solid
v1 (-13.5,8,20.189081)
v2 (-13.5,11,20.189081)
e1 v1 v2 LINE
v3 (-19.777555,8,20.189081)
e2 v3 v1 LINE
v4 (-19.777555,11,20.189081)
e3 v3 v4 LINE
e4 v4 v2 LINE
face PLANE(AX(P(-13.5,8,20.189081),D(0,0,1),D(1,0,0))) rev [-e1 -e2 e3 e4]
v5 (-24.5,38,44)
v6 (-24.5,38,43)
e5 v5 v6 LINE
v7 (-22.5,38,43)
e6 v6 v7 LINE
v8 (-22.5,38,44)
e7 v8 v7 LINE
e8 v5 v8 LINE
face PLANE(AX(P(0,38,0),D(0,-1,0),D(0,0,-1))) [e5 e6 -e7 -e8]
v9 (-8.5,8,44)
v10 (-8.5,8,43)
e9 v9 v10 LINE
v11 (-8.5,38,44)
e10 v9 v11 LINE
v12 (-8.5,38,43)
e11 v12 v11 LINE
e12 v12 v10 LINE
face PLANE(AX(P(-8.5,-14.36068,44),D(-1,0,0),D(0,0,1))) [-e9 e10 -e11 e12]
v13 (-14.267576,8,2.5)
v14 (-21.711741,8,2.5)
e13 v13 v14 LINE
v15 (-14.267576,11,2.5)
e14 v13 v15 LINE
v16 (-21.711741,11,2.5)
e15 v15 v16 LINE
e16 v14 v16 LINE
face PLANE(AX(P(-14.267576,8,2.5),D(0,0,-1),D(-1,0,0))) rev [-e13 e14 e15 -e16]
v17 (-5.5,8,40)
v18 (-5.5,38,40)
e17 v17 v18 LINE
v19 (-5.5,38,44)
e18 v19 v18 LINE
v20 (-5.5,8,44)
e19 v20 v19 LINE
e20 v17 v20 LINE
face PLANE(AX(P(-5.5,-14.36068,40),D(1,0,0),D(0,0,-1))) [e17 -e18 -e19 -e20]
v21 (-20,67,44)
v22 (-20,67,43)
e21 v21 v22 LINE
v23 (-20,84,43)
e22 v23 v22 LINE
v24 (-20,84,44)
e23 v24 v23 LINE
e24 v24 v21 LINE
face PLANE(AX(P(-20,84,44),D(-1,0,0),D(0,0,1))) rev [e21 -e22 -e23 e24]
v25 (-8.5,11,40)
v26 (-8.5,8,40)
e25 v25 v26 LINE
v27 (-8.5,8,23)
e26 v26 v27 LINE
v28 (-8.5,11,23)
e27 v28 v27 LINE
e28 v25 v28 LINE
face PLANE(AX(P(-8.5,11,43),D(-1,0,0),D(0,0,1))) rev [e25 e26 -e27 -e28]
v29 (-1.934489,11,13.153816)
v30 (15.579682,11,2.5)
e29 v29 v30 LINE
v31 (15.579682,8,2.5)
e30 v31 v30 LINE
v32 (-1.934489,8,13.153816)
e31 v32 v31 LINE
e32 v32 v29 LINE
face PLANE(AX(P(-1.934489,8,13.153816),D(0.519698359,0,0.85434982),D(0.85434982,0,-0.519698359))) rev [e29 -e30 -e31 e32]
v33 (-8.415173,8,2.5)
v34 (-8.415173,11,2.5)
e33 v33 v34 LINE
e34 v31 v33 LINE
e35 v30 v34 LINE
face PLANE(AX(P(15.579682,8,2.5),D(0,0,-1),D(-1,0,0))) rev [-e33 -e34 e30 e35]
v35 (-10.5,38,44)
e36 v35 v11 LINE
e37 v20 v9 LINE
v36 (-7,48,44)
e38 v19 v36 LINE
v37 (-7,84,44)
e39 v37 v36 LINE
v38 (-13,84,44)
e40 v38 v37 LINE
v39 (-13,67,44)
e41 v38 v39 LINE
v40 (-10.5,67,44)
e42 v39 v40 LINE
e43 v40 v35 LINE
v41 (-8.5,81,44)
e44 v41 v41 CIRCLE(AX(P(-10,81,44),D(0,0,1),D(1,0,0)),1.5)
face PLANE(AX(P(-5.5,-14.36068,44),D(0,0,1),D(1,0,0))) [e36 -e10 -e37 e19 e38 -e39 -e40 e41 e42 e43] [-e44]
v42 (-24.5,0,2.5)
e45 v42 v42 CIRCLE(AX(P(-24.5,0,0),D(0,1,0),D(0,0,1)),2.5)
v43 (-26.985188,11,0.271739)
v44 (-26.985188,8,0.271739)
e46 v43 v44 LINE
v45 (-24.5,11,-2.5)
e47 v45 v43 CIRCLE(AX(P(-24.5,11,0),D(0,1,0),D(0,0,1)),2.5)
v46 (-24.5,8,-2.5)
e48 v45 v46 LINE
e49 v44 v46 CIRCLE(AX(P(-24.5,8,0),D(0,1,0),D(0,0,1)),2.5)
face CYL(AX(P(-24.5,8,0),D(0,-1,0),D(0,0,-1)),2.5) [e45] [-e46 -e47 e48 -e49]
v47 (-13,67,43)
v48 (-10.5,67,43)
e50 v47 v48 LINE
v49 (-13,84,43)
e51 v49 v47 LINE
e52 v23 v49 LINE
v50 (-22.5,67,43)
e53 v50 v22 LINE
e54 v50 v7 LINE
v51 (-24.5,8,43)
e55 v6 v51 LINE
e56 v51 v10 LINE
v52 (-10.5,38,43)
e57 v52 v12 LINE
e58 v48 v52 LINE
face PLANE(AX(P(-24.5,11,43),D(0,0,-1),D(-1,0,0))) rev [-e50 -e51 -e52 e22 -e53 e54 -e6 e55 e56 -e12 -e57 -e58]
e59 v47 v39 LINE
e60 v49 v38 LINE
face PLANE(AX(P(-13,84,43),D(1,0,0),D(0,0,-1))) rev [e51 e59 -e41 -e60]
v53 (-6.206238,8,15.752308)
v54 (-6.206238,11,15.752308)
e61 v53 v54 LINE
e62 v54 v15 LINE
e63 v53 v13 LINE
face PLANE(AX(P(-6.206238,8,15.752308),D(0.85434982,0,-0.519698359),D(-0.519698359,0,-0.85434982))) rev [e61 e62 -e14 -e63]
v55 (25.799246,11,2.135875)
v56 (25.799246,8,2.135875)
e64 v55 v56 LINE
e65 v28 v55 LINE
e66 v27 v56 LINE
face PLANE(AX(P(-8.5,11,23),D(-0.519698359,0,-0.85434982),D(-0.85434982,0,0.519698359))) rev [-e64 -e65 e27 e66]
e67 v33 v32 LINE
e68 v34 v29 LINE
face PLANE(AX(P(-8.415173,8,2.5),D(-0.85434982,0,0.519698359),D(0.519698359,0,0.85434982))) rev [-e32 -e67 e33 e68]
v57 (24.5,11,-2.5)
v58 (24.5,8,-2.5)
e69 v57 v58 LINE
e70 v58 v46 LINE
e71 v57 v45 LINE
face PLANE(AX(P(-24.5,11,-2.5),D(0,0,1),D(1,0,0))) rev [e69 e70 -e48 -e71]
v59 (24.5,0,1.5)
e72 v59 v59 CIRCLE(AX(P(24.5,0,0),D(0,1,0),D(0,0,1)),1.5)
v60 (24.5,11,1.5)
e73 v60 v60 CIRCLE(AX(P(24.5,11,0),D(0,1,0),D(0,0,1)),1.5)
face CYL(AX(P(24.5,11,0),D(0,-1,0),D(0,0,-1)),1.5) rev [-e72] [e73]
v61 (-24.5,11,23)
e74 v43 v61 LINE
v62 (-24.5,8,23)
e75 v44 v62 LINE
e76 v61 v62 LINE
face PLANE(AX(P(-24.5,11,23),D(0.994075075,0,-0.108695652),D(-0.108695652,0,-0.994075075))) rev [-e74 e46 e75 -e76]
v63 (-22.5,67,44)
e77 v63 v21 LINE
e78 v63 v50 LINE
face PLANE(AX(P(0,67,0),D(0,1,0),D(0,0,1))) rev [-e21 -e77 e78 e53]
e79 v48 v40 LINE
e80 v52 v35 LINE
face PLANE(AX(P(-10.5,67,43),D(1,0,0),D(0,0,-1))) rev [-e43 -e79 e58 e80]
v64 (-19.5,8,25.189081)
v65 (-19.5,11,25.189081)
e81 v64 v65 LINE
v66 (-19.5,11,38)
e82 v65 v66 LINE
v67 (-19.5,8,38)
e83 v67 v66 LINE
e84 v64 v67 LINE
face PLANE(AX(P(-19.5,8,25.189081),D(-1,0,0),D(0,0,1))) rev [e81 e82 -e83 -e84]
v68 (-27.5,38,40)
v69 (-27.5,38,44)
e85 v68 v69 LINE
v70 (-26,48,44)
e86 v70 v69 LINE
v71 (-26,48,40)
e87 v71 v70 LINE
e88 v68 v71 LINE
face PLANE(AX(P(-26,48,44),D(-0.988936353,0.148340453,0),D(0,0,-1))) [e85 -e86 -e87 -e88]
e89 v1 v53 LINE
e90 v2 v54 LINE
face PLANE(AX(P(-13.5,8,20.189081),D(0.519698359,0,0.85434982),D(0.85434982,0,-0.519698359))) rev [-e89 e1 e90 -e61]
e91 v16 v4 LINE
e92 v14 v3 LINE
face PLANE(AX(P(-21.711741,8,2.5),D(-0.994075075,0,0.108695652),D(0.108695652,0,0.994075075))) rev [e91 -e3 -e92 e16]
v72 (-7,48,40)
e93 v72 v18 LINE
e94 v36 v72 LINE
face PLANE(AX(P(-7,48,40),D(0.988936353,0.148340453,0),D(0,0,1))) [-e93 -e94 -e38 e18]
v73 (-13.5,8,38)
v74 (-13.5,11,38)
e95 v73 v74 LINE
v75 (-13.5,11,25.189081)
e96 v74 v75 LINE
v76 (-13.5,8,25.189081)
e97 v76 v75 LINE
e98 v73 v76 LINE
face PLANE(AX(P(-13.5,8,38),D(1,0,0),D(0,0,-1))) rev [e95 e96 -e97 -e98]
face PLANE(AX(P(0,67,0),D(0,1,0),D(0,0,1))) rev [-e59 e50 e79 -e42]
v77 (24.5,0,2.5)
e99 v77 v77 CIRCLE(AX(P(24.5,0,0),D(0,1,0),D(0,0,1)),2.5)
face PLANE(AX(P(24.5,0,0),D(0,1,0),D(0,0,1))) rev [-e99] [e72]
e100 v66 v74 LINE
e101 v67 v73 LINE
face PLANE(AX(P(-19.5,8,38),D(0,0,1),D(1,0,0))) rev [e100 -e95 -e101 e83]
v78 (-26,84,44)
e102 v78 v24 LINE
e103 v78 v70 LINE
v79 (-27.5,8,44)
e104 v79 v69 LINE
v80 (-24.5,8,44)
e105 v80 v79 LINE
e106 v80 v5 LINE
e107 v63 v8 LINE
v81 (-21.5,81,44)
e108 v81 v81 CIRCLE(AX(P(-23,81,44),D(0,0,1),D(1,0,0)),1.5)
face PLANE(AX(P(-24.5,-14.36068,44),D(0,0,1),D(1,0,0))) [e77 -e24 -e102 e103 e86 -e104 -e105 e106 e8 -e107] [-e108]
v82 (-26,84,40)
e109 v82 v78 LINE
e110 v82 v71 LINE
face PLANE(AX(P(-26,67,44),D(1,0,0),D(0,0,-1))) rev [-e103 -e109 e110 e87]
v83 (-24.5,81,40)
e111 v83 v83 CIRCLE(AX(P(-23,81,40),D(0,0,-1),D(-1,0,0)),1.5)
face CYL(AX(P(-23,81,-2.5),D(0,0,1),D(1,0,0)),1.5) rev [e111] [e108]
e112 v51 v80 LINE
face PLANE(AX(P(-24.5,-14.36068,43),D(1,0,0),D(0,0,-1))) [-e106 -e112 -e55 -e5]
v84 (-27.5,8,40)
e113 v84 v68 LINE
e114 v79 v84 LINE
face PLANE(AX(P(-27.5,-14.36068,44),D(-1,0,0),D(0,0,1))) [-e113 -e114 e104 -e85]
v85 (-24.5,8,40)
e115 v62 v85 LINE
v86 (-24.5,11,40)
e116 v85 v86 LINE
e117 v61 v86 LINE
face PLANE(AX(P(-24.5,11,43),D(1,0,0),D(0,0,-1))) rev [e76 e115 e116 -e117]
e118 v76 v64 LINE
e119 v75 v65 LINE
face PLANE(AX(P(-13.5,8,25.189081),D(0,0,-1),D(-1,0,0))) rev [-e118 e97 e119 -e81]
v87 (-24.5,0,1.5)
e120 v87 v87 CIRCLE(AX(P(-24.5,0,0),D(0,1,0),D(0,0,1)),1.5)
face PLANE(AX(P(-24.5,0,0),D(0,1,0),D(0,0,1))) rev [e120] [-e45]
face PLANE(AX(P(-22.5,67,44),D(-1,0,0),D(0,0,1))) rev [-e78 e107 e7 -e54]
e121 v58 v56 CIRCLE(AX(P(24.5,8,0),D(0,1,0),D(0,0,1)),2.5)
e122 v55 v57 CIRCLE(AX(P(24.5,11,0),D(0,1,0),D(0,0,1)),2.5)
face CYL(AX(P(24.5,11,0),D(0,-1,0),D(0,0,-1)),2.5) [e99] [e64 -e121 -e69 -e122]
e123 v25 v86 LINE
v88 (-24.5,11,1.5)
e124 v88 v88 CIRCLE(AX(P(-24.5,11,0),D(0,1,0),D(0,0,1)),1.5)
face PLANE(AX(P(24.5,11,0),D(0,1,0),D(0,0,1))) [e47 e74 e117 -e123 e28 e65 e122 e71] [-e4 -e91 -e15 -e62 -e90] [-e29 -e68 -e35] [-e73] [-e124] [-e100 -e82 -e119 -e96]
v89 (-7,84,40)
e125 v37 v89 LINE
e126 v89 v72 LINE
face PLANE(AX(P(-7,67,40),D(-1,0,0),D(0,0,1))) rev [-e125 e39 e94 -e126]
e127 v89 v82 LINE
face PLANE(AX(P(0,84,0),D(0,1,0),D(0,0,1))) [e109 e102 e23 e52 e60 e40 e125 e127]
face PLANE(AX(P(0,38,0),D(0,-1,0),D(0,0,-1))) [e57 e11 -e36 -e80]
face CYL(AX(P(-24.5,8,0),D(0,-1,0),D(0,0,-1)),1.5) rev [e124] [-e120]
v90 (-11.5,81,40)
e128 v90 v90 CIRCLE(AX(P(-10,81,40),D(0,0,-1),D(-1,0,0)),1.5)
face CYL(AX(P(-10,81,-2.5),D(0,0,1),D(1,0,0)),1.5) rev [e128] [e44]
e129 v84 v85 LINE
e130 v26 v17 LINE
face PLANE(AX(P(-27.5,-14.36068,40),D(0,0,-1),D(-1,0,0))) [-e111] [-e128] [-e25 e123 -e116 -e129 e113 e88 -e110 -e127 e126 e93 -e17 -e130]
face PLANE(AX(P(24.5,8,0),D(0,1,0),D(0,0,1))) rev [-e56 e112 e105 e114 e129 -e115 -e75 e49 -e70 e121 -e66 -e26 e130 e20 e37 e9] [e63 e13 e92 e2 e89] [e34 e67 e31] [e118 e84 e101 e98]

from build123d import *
from OCP.BRepFilletAPI import BRepFilletAPI_MakeChamfer

# Parameters (mm, degrees)
ESQUISSE1_R             = 2.5
ESQUISSE1_R_2           = 1.5
BOSS_EXTRU_1_DEPTH      = 8
BOSS_EXTRU_1_2_DEPTH    = 8
ESQUISSE2_R             = 1.5
BOSS_EXTRU_2_DEPTH      = 3
ESQUISSE3_W             = 6
ESQUISSE3_H             = 12.810919071
ENL_V_MAT_EXTRU_1_DEPTH = 3
BOSS_EXTRU_3_START      = -3
BOSS_EXTRU_3_DEPTH      = 30
BOSS_EXTRU_5_DEPTH      = 29
BOSS_EXTRU_6_DEPTH      = 17
ESQUISSE7_R             = 1.5
ENL_V_MAT_EXTRU_2_DEPTH = 100.872418615
CHANFREIN1_SIZE         = 1.5
CHANFREIN1_SIZE_2       = 10


with BuildPart() as part:
    # Esquisse1 → Boss.-Extru.1 (new body)
    with BuildSketch(Plane(origin=(0, 0, 0), x_dir=(1, 0, 0), z_dir=(0, 1, 0))):
        with Locations(Location((-24.5, 0, 0), (0, 0, 270))):
            Circle(ESQUISSE1_R)
        with Locations(Location((-24.5, 0, 0), (0, 0, 270))):
            Circle(ESQUISSE1_R_2, mode=Mode.SUBTRACT)
    extrude(amount=BOSS_EXTRU_1_DEPTH)



with BuildPart() as body_2:
    # Esquisse1 → Boss.-Extru.1 2 (new body)
    with BuildSketch(Plane(origin=(0, 0, 0), x_dir=(1, 0, 0), z_dir=(0, 1, 0))):
        with Locations(Location((24.5, 0, 0), (0, 0, 270))):
            Circle(ESQUISSE1_R)
        with Locations(Location((24.5, 0, 0), (0, 0, 270))):
            Circle(ESQUISSE1_R_2, mode=Mode.SUBTRACT)
    extrude(amount=BOSS_EXTRU_1_2_DEPTH)


with BuildPart() as part_1:
    add(part.part)

    add(body_2.part)  # Boss.-Extru.2 merges body 2
    # Esquisse2 → Boss.-Extru.2 (add)
    with BuildSketch(Plane(origin=(0, 8, 0), x_dir=(1, 0, 0), z_dir=(0, 1, 0))):
        with BuildLine():
            Line((-24.5, 2.5), (24.5, 2.5))
            ThreePointArc((24.5, 2.5), (26.907248053, 0.674653105), (25.799245899, -2.13587455))
            Line((25.799245899, -2.13587455), (-8.5, -23))
            Line((-8.5, -23), (-8.5, -43))
            Line((-8.5, -43), (-24.5, -43))
            Line((-24.5, -43), (-24.5, -23))
            Line((-24.5, -23), (-26.985187688, -0.27173913))
            ThreePointArc((-26.985187688, -0.27173913), (-26.361363455, 1.668929623), (-24.5, 2.5))
        make_face()
        with Locations(Location((-24.5, 0, 0), (0, 0, 270))):
            Circle(ESQUISSE2_R, mode=Mode.SUBTRACT)
        with Locations(Location((24.5, 0, 0), (0, 0, 270))):
            Circle(ESQUISSE2_R, mode=Mode.SUBTRACT)
    extrude(amount=BOSS_EXTRU_2_DEPTH)

    # Esquisse3 → Enlèv. mat.-Extru.1 (cut)
    with BuildSketch(Plane(origin=(0, 11, 0), x_dir=(1, 0, 0), z_dir=(0, 1, 0))):
        Polygon((-6.206238259, -15.752308167), (-14.267576426, -2.5), (-21.711740643, -2.5), (-19.777554548, -20.189080929), (-13.5, -20.189080929), align=None)
        Polygon((-8.415172783, -2.5), (-1.934489158, -13.153816369), (15.579682155, -2.5), align=None)
        with Locations((-16.5, -31.594540464)):
            Rectangle(ESQUISSE3_W, ESQUISSE3_H)
    extrude(amount=-ENL_V_MAT_EXTRU_1_DEPTH, mode=Mode.SUBTRACT)

    # Esquisse4 → Boss.-Extru.3 (add)
    with BuildSketch(Plane(origin=(0, 11, 0), x_dir=(1, 0, 0), z_dir=(0, 1, 0)).offset(BOSS_EXTRU_3_START)):
        Polygon((-24.5, -44), (-27.5, -44), (-27.5, -40), (-24.5, -40), (-8.5, -40), (-5.5, -40), (-5.5, -44), (-8.5, -44), (-8.5, -43), (-24.5, -43), align=None)
    extrude(amount=BOSS_EXTRU_3_DEPTH)

    # Esquisse5 → Boss.-Extru.5 (add)
    with BuildSketch(Plane(origin=(0, 38, 0), x_dir=(1, 0, 0), z_dir=(0, 1, 0))):
        Polygon((-26, -44), (-22.5, -44), (-22.5, -43), (-10.5, -43), (-10.5, -44), (-7, -44), (-7, -40), (-26, -40), align=None)
    extrude(amount=BOSS_EXTRU_5_DEPTH)

    # Esquisse6 → Boss.-Extru.6 (add)
    with BuildSketch(Plane(origin=(0, 67, 0), x_dir=(1, 0, 0), z_dir=(0, 1, 0))):
        Polygon((-20, -44), (-20, -43), (-13, -43), (-13, -44), (-7, -44), (-7, -40), (-26, -40), (-26, -44), align=None)
    extrude(amount=BOSS_EXTRU_6_DEPTH)

    # Esquisse7 → Enlèv. mat.-Extru.2 (cut, through all)
    with BuildSketch(Plane.XY.offset(44)):
        with Locations((-23, 81)):
            Circle(ESQUISSE7_R)
        with Locations((-10, 81)):
            Circle(ESQUISSE7_R)
    extrude(amount=-ENL_V_MAT_EXTRU_2_DEPTH, mode=Mode.SUBTRACT)

    # Chanfrein1
    chanfrein1_edges_1 = [part_1.edges().sort_by_distance(p)[0] for p in [
        (-26, 38, 42),
    ]]
    chanfrein1_side_1 = [part_1.faces().sort_by_distance(p)[0] for p in [
        (-26.03, 38, 42),
    ]]
    chanfrein1_edges_2 = [part_1.edges().sort_by_distance(p)[0] for p in [
        (-7, 38, 42),
    ]]
    chanfrein1_side_2 = [part_1.faces().sort_by_distance(p)[0] for p in [
        (-6.97, 38, 42),
    ]]
    chanfrein1 = BRepFilletAPI_MakeChamfer(part_1.part.solid().wrapped)
    for e in chanfrein1_edges_1:
        chanfrein1.Add(CHANFREIN1_SIZE - 0.0001, CHANFREIN1_SIZE_2 - 0.0001, e.wrapped, chanfrein1_side_1[0].wrapped)
    for e in chanfrein1_edges_2:
        chanfrein1.Add(CHANFREIN1_SIZE - 0.0001, CHANFREIN1_SIZE_2 - 0.0001, e.wrapped, chanfrein1_side_2[0].wrapped)
    add(Compound.cast(chanfrein1.Shape()), mode=Mode.REPLACE)  # a hair under: the kernel refuses the full size


solid = part_1.part
